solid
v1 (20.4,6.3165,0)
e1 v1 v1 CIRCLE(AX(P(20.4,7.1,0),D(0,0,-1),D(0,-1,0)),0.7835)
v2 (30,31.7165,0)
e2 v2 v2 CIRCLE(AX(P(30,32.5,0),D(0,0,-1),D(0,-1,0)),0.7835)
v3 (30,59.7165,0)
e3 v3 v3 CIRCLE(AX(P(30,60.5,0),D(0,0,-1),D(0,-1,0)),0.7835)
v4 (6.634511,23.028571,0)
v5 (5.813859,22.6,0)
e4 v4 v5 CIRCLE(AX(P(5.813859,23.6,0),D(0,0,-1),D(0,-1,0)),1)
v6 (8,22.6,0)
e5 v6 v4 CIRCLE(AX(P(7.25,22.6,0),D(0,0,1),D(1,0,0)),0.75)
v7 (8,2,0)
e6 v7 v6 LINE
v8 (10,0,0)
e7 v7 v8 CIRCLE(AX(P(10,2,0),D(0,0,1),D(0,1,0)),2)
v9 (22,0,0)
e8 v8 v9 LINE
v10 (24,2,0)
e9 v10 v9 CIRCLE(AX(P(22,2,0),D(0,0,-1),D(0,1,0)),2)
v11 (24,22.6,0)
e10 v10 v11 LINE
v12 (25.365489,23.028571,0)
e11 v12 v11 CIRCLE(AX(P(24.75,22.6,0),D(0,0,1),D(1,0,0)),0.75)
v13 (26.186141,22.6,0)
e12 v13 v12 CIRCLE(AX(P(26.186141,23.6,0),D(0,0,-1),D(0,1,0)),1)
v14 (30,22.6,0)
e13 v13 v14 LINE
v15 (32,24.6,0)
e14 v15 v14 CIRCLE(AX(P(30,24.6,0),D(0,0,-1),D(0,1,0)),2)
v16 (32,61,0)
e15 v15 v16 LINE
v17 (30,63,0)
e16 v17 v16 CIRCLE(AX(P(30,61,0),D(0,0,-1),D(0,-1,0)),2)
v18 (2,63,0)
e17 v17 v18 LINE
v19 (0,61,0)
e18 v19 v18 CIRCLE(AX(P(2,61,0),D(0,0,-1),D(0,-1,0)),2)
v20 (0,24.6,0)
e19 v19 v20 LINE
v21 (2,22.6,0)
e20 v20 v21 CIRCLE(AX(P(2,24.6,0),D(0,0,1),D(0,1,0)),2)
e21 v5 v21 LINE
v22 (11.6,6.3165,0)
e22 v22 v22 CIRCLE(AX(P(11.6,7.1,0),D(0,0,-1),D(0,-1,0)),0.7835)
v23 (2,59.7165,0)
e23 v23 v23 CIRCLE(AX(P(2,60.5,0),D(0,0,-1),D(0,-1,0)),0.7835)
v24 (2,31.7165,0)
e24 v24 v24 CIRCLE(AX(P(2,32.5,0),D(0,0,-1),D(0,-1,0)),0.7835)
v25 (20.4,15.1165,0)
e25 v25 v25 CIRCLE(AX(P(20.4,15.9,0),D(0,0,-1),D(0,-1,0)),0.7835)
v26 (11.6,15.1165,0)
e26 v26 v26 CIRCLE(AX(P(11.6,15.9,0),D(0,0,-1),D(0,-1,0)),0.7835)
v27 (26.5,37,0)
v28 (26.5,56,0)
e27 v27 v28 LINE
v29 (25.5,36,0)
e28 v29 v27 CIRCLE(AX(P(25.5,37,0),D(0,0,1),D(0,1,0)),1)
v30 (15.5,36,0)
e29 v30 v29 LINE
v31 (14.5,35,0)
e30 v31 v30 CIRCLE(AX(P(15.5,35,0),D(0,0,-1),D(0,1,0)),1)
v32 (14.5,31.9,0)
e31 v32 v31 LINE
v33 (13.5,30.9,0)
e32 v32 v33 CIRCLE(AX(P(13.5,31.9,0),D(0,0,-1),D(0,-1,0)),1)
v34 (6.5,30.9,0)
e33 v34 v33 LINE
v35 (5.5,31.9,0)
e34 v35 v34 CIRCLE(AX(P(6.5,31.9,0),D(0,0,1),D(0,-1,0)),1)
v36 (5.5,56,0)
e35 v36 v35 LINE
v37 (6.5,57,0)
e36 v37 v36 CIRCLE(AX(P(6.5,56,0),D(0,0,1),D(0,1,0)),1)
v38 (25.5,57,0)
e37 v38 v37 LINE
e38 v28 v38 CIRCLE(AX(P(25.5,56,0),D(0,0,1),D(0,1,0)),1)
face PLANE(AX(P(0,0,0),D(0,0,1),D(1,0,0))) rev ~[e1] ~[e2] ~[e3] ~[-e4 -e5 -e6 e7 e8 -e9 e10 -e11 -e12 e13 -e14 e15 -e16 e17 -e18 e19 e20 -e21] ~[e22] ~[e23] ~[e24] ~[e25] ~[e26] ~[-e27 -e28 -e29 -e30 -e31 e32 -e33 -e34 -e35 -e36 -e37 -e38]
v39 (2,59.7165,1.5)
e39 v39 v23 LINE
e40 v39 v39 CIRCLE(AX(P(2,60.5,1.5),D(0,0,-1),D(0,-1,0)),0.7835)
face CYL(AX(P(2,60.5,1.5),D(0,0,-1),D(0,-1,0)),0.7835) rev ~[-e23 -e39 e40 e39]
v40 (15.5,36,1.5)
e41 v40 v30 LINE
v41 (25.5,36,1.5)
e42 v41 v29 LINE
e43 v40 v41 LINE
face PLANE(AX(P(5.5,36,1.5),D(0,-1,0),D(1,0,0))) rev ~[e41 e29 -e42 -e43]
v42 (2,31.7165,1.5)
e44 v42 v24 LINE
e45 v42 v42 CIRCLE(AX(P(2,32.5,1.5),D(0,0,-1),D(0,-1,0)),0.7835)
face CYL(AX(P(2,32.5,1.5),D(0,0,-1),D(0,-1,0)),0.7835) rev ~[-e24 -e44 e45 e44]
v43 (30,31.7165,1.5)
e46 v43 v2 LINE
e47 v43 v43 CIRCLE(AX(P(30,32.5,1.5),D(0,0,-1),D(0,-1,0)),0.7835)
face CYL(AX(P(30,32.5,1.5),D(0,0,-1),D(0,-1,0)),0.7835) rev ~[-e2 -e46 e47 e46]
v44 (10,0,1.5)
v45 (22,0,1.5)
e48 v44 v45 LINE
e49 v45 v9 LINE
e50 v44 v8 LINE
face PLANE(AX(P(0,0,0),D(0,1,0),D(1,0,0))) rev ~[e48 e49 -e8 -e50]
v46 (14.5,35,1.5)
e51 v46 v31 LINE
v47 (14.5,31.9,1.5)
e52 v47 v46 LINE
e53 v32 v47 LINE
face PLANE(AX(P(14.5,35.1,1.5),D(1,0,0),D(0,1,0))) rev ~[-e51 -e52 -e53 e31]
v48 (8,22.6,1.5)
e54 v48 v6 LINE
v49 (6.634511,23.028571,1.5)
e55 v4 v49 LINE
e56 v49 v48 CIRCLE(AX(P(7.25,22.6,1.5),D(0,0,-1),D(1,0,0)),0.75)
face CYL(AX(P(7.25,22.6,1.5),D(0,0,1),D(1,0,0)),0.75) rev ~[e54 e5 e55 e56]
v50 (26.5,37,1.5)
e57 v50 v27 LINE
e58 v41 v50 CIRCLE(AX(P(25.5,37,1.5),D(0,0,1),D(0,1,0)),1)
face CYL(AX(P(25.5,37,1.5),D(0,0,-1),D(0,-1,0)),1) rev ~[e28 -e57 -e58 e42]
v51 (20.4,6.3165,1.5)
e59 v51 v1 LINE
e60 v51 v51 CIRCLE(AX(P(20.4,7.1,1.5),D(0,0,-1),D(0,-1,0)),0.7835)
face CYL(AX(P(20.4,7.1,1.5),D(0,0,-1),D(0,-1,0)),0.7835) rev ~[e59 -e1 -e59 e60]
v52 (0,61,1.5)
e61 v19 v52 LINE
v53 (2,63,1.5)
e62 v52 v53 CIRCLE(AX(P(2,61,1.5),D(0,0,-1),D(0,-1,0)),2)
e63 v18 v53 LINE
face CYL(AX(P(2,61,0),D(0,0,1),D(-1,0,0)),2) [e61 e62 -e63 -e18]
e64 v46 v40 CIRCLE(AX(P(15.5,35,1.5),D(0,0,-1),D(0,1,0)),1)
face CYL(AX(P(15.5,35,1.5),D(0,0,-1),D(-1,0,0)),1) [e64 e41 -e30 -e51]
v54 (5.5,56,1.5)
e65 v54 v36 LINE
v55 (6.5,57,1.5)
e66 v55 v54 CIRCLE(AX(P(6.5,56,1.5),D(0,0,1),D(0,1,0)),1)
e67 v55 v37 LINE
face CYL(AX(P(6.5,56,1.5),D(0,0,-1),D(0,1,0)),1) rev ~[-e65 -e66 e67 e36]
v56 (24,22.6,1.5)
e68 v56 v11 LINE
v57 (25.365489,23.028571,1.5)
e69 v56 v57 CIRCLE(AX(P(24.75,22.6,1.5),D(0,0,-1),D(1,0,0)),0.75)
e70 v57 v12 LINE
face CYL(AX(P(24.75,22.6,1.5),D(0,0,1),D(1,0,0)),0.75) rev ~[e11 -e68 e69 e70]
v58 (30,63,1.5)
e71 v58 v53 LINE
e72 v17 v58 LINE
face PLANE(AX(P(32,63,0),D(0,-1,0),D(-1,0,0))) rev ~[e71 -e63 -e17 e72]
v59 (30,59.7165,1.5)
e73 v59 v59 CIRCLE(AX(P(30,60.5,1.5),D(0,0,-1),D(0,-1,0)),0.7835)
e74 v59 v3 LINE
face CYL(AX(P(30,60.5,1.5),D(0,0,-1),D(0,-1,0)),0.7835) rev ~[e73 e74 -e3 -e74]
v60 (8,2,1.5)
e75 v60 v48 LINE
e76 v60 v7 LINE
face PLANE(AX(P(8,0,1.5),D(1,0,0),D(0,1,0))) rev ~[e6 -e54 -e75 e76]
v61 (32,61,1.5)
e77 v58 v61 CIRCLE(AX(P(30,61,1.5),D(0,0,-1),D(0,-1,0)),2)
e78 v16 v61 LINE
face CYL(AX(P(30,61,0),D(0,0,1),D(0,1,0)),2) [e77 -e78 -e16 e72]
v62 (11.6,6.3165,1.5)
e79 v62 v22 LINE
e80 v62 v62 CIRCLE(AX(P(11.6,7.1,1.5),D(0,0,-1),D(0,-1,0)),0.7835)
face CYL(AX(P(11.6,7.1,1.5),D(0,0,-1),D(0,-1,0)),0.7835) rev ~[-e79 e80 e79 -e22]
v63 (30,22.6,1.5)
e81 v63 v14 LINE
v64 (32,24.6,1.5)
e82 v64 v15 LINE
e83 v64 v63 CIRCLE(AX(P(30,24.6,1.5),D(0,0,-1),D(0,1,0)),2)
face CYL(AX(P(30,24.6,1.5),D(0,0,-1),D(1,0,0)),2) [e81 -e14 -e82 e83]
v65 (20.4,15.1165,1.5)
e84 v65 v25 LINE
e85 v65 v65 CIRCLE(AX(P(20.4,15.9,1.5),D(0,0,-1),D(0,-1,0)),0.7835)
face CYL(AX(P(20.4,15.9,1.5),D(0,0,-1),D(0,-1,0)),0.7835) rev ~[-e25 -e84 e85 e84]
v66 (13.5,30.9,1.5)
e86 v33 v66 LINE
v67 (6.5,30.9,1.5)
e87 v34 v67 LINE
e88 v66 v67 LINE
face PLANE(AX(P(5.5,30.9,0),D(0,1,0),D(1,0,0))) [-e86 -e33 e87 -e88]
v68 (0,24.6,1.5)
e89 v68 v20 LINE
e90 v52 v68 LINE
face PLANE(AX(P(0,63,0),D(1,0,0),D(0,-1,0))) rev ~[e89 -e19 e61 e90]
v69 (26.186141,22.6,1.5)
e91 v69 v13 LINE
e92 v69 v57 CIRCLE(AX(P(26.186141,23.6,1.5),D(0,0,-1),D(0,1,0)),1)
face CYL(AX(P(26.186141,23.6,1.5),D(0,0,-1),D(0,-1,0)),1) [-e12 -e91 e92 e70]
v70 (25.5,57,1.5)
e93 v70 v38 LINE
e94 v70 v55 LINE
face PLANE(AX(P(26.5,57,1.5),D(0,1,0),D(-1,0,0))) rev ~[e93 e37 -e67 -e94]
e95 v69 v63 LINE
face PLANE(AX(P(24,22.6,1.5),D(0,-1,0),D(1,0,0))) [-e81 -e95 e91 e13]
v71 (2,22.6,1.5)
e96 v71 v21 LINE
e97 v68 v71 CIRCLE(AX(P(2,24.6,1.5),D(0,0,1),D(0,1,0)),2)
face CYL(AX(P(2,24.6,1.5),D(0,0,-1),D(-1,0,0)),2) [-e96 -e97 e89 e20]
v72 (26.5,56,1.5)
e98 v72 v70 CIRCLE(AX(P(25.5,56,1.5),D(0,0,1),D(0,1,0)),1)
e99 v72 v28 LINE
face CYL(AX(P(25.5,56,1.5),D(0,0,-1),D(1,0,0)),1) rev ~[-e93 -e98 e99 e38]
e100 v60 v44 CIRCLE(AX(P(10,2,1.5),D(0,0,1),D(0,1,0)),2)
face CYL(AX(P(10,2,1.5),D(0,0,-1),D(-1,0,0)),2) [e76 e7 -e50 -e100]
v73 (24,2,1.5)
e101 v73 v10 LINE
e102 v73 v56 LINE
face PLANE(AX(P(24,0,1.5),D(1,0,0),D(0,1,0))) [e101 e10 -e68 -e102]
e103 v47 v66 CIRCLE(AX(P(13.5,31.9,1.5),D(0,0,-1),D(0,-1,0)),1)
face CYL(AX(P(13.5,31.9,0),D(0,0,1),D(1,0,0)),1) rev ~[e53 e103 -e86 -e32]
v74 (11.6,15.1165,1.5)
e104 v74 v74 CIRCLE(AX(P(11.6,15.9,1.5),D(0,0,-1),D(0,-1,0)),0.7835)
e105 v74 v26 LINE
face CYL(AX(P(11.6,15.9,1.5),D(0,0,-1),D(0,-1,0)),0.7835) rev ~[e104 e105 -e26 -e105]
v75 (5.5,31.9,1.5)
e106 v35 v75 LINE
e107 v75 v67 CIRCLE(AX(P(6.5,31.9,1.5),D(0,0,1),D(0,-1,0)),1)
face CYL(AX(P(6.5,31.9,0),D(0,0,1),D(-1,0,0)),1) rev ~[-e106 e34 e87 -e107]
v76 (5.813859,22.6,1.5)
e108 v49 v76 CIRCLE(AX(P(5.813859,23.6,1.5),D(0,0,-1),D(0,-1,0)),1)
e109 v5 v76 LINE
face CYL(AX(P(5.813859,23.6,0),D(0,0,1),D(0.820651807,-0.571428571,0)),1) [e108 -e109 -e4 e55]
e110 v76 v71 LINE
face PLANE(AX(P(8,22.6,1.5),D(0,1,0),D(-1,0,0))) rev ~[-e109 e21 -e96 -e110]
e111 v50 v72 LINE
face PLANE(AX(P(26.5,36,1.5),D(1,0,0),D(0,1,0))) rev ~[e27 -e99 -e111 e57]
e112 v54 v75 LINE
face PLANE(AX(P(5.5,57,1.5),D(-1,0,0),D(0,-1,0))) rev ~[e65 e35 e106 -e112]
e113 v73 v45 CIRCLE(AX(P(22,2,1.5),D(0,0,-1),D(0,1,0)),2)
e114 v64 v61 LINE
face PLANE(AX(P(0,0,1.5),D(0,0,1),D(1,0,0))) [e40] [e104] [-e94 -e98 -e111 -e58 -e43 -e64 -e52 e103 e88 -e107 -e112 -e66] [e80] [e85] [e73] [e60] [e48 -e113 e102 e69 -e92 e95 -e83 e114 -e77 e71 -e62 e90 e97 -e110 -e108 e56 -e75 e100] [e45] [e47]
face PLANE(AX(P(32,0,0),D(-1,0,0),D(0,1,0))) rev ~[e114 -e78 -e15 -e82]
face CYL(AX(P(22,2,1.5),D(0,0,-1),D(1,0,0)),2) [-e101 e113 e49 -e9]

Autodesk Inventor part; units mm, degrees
ref_plane "YZ Plane" through (0, 0, 0) normal (1, 0, 0) x (0, 1, 0)
ref_plane "XZ Plane" through (0, 0, 0) normal (0, 1, 0) x (-1, 0, 0)
ref_plane "XY Plane" through (0, 0, 0) normal (0, 0, 1) x (1, 0, 0)
sketch "スケッチ1" plane through (0, 0, 0) normal (0, 0, 1) x (1, 0, 0)
  line L0 (0, 0) -> (32, 0)
  line L1 (32, 0) -> (32, 63)
  line L2 (32, 63) -> (0, 63)
  line L3 (0, 63) -> (0, 0)
  dimension "d0" = 32
  dimension "d1" = 63
extrude "押し出し1" add sketch "スケッチ1" along normal blind 1.5
sketch "スケッチ2" plane through (0, 0, 1.5) normal (0, 0, 1) x (1, 0, 0)
  line L0 (2, 60.5) -> (30, 60.5)
  line L1 (30, 60.5) -> (30, 32.5)
  line L2 (30, 32.5) -> (2, 32.5)
  line L3 (2, 32.5) -> (2, 60.5)
  line L4 (32, 63) -> (0, 63) projected
  line L5 (16, 63) -> (16, 60.5)
  point P0 (0, 0)
  dimension "d4" = 28
  dimension "d5" = 28
  dimension "d6" = 2.5
hole "穴1" at (30, 60.5, 1.5) at (2, 60.5, 1.5) at (30, 32.5, 1.5) at (2, 32.5, 1.5) direction (0, 0, -1) diameter 1.567 end through all thread size "M2x0.4" class "6H" standard "ISO Metric profile"
sketch "スケッチ3" plane through (0, 0, 1.5) normal (0, 0, 1) x (1, 0, 0)
  circle A0 centre (30, 32.5) radius 0.7835 projected
  circle A1 centre (30, 60.5) radius 0.7835 projected
  circle A2 centre (2, 60.5) radius 0.7835 projected
  circle A3 centre (2, 32.5) radius 0.7835 projected
  line L0 (0, 0) -> (32, 0) projected
  line L1 (32, 0) -> (32, 63) projected
  line L2 (32, 63) -> (0, 63) projected
  line L3 (0, 63) -> (0, 0) projected
  line L4 (0, 0) -> (8, 0)
  line L5 (8, 0) -> (8, 22.6)
  line L6 (8, 22.6) -> (0, 22.6)
  line L7 (0, 22.6) -> (0, 0)
  line L8 (0, 0) -> (32, 0) projected
  line L9 (16, 0) -> (16, 3.4564)
  line L10 (32, 0) -> (24, 0)
  line L11 (24, 0) -> (24, 22.6)
  line L12 (24, 22.6) -> (32, 22.6)
  line L13 (32, 22.6) -> (32, 0)
  dimension "d14" = 22.6
  dimension "d15" = 16
extrude "押し出し2" cut sketch "スケッチ3" against normal through all contours L3 L6 L5 L0 | L11 L12 L1 L0
sketch "スケッチ4" plane through (0, 0, 1.5) normal (0, 0, 1) x (1, 0, 0)
  line L0 (8, 22.6) -> (8, 0) projected
  line L1 (8, 0) -> (24, 0) projected
  line L2 (24, 0) -> (24, 22.6) projected
  line L3 (24, 22.6) -> (32, 22.6) projected
  line L4 (32, 22.6) -> (32, 63) projected
  line L5 (32, 63) -> (0, 63) projected
  line L6 (0, 63) -> (0, 22.6) projected
  line L7 (0, 22.6) -> (8, 22.6) projected
  circle A0 centre (30, 32.5) radius 0.7835 projected
  circle A1 centre (30, 60.5) radius 0.7835 projected
  circle A2 centre (2, 60.5) radius 0.7835 projected
  circle A3 centre (2, 32.5) radius 0.7835 projected
  line L8 (11.6, 15.9) -> (20.4, 15.9)
  line L9 (20.4, 15.9) -> (20.4, 7.1)
  line L10 (20.4, 7.1) -> (11.6, 7.1)
  line L11 (11.6, 7.1) -> (11.6, 15.9)
  line L12 (8, 0) -> (24, 0) projected
  line L13 (16, 0) -> (16, 7.1)
  line L14 (24, 0) -> (24, 22.6) projected
  line L15 (8, 0) -> (24, 0) projected
  point P0 (0, 0)
  dimension "d18" = 8.8
  dimension "d19" = 8.8
  dimension "d27" = 6.7
hole "穴2" at (20.4, 15.9, 1.5) at (20.4, 7.1, 1.5) at (11.6, 7.1, 1.5) at (11.6, 15.9, 1.5) direction (0, 0, -1) diameter 1.567 end through all thread size "M2x0.4" class "6H" standard "ISO Metric profile"
sketch "スケッチ5" plane through (0, 0, 0) normal (0, 0, -1) x (-1, 0, 0)
  line L0 (-6, 34.6) -> (-14, 34.6) projected
  line L1 (-14, 34.6) -> (-14, 31.4) projected
  line L2 (-14, 31.4) -> (-6, 31.4) projected
  line L3 (-6, 31.4) -> (-6, 34.6) projected
  line L4 (-14.5, 35.1) -> (-5.5, 35.1)
  line L5 (-5.5, 35.1) -> (-5.5, 30.9)
  line L6 (-5.5, 30.9) -> (-14.5, 30.9)
  line L7 (-14.5, 30.9) -> (-14.5, 35.1)
  point P0 (0, 0)
  dimension "d28" = 0.5
extrude "押し出し3" cut sketch "スケッチ5" against normal through all contours L3 L2 L1 L0 | L4 L5 L6 L7
fillet "フィレット1" radius 2 6 edges at (32, 63, 0.75) (0, 63, 0.75) (0, 22.6, 0.75) (32, 22.6, 0.75) (8, 0, 0.75) (24, 0, 0.75)
sketch "スケッチ6" plane through (0, 0, 1.5) normal (0, 0, 1) x (1, 0, 0)
  line L0 (14.5, 35.1) -> (14.5, 30.9) projected
  line L1 (14.5, 30.9) -> (5.5, 30.9) projected
  line L2 (5.5, 30.9) -> (5.5, 35.1) projected
  line L3 (5.5, 35.1) -> (14.5, 35.1) projected
  circle A0 centre (11.6, 7.1) radius 0.7835 projected
  circle A1 centre (20.4, 15.9) radius 0.7835 projected
  circle A2 centre (20.4, 7.1) radius 0.7835 projected
  circle A3 centre (11.6, 15.9) radius 0.7835 projected
  arc A4 (22, 0) -> (24, 2) centre (22, 2) ccw projected
  line L4 (24, 2) -> (24, 22.6) projected
  line L5 (24, 22.6) -> (30, 22.6) projected
  arc A5 (30, 22.6) -> (32, 24.6) centre (30, 24.6) ccw projected
  line L6 (32, 24.6) -> (32, 61) projected
  arc A6 (32, 61) -> (30, 63) centre (30, 61) ccw projected
  line L7 (30, 63) -> (2, 63) projected
  arc A7 (2, 63) -> (0, 61) centre (2, 61) ccw projected
  line L8 (0, 61) -> (0, 24.6) projected
  arc A8 (0, 24.6) -> (2, 22.6) centre (2, 24.6) ccw projected
  line L9 (2, 22.6) -> (8, 22.6) projected
  line L10 (8, 22.6) -> (8, 2) projected
  arc A9 (8, 2) -> (10, 0) centre (10, 2) ccw projected
  line L11 (10, 0) -> (22, 0) projected
  circle A10 centre (30, 32.5) radius 0.7835 projected
  circle A11 centre (30, 60.5) radius 0.7835 projected
  circle A12 centre (2, 60.5) radius 0.7835 projected
  circle A13 centre (2, 32.5) radius 0.7835 projected
  line L12 (8, 22.6) -> (2, 22.6) projected
  circle A14 centre (7.25, 22.6) radius 0.75
  line L13 (30, 22.6) -> (24, 22.6) projected
  circle A15 centre (24.75, 22.6) radius 0.75
  line L14 (8, 22.6) -> (8, 2) projected
  line L15 (24, 2) -> (24, 22.6) projected
  point P0 (0, 0)
  dimension "d34" = 1.5
  dimension "d35" = 1.5
extrude "押し出し4" cut sketch "スケッチ6" against normal through all contours A15 L5 | L5 A15 | A14 L9 | L9 A14
fillet "フィレット2" radius 1 4 edges at (8, 22.6, 0.75) (6.5, 22.6, 0.75) (25.5, 22.6, 0.75) (24, 22.6, 0.75)
sketch "スケッチ7" plane through (0, 0, 1.5) normal (0, 0, 1) x (1, 0, 0)
  arc A0 (25.3655, 23.0286) -> (26.1861, 22.6) centre (26.1861, 23.6) ccw projected
  line L0 (26.1861, 22.6) -> (30, 22.6) projected
  arc A1 (30, 22.6) -> (32, 24.6) centre (30, 24.6) ccw projected
  line L1 (32, 24.6) -> (32, 61) projected
  arc A2 (32, 61) -> (30, 63) centre (30, 61) ccw projected
  line L2 (30, 63) -> (2, 63) projected
  arc A3 (2, 63) -> (0, 61) centre (2, 61) ccw projected
  line L3 (0, 61) -> (0, 24.6) projected
  arc A4 (0, 24.6) -> (2, 22.6) centre (2, 24.6) ccw projected
  line L4 (2, 22.6) -> (5.8139, 22.6) projected
  arc A5 (5.8139, 22.6) -> (6.6345, 23.0286) centre (5.8139, 23.6) ccw projected
  arc A6 (8, 22.6) -> (6.6345, 23.0286) centre (7.25, 22.6) ccw projected
  line L5 (8, 22.6) -> (8, 2) projected
  arc A7 (8, 2) -> (10, 0) centre (10, 2) ccw projected
  line L6 (10, 0) -> (22, 0) projected
  arc A8 (22, 0) -> (24, 2) centre (22, 2) ccw projected
  line L7 (24, 2) -> (24, 22.6) projected
  arc A9 (25.3655, 23.0286) -> (24, 22.6) centre (24.75, 22.6) ccw projected
  line L8 (14.5, 35.1) -> (14.5, 30.9) projected
  line L9 (14.5, 30.9) -> (5.5, 30.9) projected
  line L10 (5.5, 30.9) -> (5.5, 35.1) projected
  line L11 (5.5, 35.1) -> (14.5, 35.1) projected
  circle A10 centre (11.6, 7.1) radius 0.7835 projected
  circle A11 centre (20.4, 15.9) radius 0.7835 projected
  circle A12 centre (20.4, 7.1) radius 0.7835 projected
  circle A13 centre (11.6, 15.9) radius 0.7835 projected
  circle A14 centre (30, 32.5) radius 0.7835 projected
  circle A15 centre (30, 60.5) radius 0.7835 projected
  circle A16 centre (2, 60.5) radius 0.7835 projected
  circle A17 centre (2, 32.5) radius 0.7835 projected
  circle A18 centre (2, 60.5) radius 0.7835 projected
  line L12 (2, 60.5) -> (30, 60.5)
  line L13 (30, 60.5) -> (30, 32.5)
  line L14 (30, 32.5) -> (2, 32.5)
  line L15 (2, 32.5) -> (2, 60.5)
  line L16 (26.5, 57) -> (5.5, 57)
  line L17 (5.5, 57) -> (5.5, 36)
  line L18 (5.5, 36) -> (26.5, 36)
  line L19 (26.5, 36) -> (26.5, 57)
  point P0 (0, 0)
  dimension "d38" = 21
extrude "押し出し5" cut sketch "スケッチ7" against normal through all contours L19 L18 L17 L16
sketch "スケッチ8" plane through (0, 0, 1.5) normal (0, 0, 1) x (1, 0, 0)
  line L0 (5.5, 36) -> (5.5, 57) projected
  line L1 (5.5, 57) -> (26.5, 57) projected
  line L2 (26.5, 57) -> (26.5, 36) projected
  line L3 (26.5, 36) -> (5.5, 36) projected
  arc A0 (25.3655, 23.0286) -> (26.1861, 22.6) centre (26.1861, 23.6) ccw projected
  line L4 (26.1861, 22.6) -> (30, 22.6) projected
  arc A1 (30, 22.6) -> (32, 24.6) centre (30, 24.6) ccw projected
  line L5 (32, 24.6) -> (32, 61) projected
  arc A2 (32, 61) -> (30, 63) centre (30, 61) ccw projected
  line L6 (30, 63) -> (2, 63) projected
  arc A3 (2, 63) -> (0, 61) centre (2, 61) ccw projected
  line L7 (0, 61) -> (0, 24.6) projected
  arc A4 (0, 24.6) -> (2, 22.6) centre (2, 24.6) ccw projected
  line L8 (2, 22.6) -> (5.8139, 22.6) projected
  arc A5 (5.8139, 22.6) -> (6.6345, 23.0286) centre (5.8139, 23.6) ccw projected
  arc A6 (8, 22.6) -> (6.6345, 23.0286) centre (7.25, 22.6) ccw projected
  line L9 (8, 22.6) -> (8, 2) projected
  arc A7 (8, 2) -> (10, 0) centre (10, 2) ccw projected
  line L10 (10, 0) -> (22, 0) projected
  arc A8 (22, 0) -> (24, 2) centre (22, 2) ccw projected
  line L11 (24, 2) -> (24, 22.6) projected
  arc A9 (25.3655, 23.0286) -> (24, 22.6) centre (24.75, 22.6) ccw projected
  line L12 (14.5, 35.1) -> (14.5, 30.9) projected
  line L13 (14.5, 30.9) -> (5.5, 30.9) projected
  line L14 (5.5, 30.9) -> (5.5, 35.1) projected
  line L15 (5.5, 35.1) -> (14.5, 35.1) projected
  circle A10 centre (11.6, 7.1) radius 0.7835 projected
  circle A11 centre (20.4, 15.9) radius 0.7835 projected
  circle A12 centre (20.4, 7.1) radius 0.7835 projected
  circle A13 centre (11.6, 15.9) radius 0.7835 projected
  circle A14 centre (30, 32.5) radius 0.7835 projected
  circle A15 centre (30, 60.5) radius 0.7835 projected
  circle A16 centre (2, 60.5) radius 0.7835 projected
  circle A17 centre (2, 32.5) radius 0.7835 projected
  line L16 (5.5, 36) -> (5.5, 35.1)
  line L17 (14.5, 35.1) -> (14.5, 36)
  point P0 (0, 0)
extrude "押し出し6" cut sketch "スケッチ8" against normal through all contours L3 L17 L15 L16
fillet "フィレット5" radius 1 6 edges at (5.5, 57, 0.75) (26.5, 57, 0.75) (26.5, 36, 0.75) (14.5, 30.9, 0.75) (5.5, 30.9, 0.75) (14.5, 36, 0.75)
properties part number "手先カメラ" material "アルミニウム 6061"
